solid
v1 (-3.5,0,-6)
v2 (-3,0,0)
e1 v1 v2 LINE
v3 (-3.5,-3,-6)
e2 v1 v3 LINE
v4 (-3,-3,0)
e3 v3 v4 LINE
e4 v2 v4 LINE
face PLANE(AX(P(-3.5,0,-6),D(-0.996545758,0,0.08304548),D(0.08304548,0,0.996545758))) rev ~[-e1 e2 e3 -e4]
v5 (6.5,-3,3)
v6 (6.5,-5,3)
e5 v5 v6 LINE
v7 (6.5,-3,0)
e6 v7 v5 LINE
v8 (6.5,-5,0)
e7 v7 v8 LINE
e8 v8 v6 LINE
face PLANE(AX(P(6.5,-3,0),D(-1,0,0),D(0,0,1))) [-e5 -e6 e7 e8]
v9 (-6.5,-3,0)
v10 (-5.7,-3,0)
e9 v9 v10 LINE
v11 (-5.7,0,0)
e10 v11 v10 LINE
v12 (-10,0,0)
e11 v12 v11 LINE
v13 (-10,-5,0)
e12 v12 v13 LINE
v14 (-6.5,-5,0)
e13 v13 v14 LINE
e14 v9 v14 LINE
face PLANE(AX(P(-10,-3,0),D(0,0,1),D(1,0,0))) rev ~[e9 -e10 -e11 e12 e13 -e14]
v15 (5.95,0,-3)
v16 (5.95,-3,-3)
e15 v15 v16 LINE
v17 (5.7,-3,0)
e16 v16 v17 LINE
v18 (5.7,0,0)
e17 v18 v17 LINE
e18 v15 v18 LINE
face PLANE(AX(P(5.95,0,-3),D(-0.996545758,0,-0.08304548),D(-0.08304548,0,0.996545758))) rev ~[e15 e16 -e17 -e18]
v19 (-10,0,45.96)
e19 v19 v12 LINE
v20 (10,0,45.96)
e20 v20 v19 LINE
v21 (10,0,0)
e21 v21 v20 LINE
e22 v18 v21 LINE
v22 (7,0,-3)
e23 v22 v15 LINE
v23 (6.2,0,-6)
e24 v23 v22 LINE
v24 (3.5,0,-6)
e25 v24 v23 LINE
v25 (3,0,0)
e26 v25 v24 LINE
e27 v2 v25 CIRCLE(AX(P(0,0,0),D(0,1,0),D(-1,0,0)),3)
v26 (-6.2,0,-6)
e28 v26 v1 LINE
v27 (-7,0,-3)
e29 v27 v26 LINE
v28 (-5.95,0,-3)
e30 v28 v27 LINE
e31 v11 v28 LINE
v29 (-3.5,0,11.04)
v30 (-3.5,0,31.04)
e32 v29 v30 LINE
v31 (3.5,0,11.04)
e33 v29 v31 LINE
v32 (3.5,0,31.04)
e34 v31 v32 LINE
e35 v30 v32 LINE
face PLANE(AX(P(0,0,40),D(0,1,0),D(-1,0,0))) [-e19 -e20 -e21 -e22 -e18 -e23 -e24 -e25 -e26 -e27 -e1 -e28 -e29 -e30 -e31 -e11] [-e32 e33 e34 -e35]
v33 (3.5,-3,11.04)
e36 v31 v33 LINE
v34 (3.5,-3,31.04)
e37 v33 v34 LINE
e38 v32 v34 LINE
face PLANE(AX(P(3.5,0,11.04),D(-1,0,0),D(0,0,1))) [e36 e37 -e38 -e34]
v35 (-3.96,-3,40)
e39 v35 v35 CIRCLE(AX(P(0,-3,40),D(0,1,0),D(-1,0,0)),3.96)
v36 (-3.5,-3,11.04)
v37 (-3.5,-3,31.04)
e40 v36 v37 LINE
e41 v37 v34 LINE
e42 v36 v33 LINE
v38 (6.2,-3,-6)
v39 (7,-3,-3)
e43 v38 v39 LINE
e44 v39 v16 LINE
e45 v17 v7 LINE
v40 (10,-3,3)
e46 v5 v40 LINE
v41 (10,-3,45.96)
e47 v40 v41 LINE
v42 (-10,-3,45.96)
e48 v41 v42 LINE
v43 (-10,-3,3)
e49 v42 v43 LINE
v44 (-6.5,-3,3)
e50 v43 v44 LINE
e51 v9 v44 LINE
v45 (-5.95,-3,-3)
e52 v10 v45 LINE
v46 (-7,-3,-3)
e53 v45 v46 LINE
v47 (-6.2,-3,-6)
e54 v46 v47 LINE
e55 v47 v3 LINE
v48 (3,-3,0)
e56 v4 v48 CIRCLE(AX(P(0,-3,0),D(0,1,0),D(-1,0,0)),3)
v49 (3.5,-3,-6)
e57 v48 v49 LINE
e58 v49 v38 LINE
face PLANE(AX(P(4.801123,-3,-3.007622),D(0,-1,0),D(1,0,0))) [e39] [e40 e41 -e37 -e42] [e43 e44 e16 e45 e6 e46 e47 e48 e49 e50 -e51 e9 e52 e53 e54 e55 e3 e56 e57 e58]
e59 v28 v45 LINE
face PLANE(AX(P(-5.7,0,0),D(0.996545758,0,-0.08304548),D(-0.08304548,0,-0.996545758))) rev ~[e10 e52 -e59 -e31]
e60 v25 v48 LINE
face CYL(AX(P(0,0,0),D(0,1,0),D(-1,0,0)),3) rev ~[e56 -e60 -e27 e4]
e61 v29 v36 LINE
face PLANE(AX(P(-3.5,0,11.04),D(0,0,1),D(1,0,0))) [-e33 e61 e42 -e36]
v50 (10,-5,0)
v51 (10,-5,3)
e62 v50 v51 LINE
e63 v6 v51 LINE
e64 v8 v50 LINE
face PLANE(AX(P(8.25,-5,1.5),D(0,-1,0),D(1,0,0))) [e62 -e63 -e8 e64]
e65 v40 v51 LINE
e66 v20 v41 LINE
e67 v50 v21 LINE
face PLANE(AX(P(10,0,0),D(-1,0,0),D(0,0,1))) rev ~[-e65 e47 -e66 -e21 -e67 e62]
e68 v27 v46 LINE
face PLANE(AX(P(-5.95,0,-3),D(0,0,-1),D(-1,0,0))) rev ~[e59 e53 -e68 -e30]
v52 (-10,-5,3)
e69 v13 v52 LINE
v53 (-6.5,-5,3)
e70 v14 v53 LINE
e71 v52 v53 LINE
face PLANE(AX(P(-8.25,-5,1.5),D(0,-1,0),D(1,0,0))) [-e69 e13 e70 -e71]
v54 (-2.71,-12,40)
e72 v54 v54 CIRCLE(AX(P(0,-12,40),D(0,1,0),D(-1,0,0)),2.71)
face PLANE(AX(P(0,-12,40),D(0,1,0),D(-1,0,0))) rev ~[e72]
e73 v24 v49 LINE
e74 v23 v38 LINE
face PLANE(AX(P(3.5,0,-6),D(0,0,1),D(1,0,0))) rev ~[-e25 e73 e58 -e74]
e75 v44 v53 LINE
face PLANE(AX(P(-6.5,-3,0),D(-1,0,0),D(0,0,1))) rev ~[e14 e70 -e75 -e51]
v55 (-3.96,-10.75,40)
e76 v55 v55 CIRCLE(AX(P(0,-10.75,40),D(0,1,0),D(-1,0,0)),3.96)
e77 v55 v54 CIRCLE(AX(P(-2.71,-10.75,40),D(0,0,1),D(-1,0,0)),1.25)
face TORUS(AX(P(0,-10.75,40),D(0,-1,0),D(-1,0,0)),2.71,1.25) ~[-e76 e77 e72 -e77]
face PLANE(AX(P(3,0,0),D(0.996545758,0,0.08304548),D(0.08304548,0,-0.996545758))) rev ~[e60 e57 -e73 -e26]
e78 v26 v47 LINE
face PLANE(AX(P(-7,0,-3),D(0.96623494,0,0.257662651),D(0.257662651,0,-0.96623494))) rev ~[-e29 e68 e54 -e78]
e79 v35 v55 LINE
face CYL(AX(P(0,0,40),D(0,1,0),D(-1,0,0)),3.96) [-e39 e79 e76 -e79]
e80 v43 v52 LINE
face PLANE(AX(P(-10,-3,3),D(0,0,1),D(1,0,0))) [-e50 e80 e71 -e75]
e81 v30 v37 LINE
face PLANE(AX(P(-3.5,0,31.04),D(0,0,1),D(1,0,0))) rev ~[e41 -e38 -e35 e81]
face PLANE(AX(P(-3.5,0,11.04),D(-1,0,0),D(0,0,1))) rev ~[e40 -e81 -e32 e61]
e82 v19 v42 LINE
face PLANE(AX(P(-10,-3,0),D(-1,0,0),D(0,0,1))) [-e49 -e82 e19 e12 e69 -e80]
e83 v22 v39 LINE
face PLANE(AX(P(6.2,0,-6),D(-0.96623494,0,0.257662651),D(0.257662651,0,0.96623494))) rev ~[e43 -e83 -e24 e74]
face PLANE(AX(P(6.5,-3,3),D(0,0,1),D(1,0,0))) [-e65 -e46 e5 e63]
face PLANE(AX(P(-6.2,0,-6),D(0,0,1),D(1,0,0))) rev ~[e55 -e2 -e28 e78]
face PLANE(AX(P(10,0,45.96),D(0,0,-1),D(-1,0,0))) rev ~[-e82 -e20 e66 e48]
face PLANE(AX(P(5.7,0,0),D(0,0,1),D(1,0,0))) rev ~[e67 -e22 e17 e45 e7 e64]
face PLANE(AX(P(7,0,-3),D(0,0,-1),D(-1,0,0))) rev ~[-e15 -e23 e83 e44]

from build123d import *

# Parameters (mm, degrees)
F0_W     = 7
F0_H     = 20
F0_R     = 3.96
F1_DEPTH = 3
F2_R     = 3.96
F3_DEPTH = 12
F4_R     = 1.25
F5_W     = 3.5
F5_H     = 3
F6_DEPTH = 2


with BuildPart() as f1:
    # F0 (on Front) → F1 (new body)
    with BuildSketch(Plane.XZ):
        Polygon((5.7, 0), (3, 0), (3.5, -6), (6.2, -6), (7, -3), (5.95, -3), align=None)
        with BuildLine():
            ThreePointArc((-3, 0), (0, 3), (3, 0))
            Line((3, 0), (5.7, 0))
            Line((5.7, 0), (10, 0))
            Line((10, 0), (10, 45.96))
            Line((10, 45.96), (-10, 45.96))
            Line((-10, 45.96), (-10, 0))
            Line((-10, 0), (-5.7, 0))
            Line((-5.7, 0), (-3, 0))
        make_face()
        with Locations((0, 21.04)):
            Rectangle(F0_W, F0_H, mode=Mode.SUBTRACT)
        with Locations((0, 40)):
            Circle(F0_R, mode=Mode.SUBTRACT)
        Polygon((-3.5, -6), (-3, 0), (-5.7, 0), (-5.95, -3), (-7, -3), (-6.2, -6), align=None)
        with Locations((0, 40)):
            Circle(F0_R)
    extrude(amount=F1_DEPTH)

    # F2 (on face) → F3 (join)
    with BuildSketch(Plane(origin=(0, 0, 0), x_dir=(-1, 0, 0), z_dir=(0, 1, 0))):
        with Locations((0, 40)):
            Circle(F2_R)
    extrude(amount=-F3_DEPTH)

    # F4
    f4_edges = [f1.edges().sort_by_distance(p)[0] for p in [
        (3.96, -12, 40),
    ]]
    fillet(f4_edges, radius=F4_R)

    # F5 (on face) → F6 (join)
    with BuildSketch(Plane.XZ.offset(3)):
        with Locations((-8.25, 1.5)):
            Rectangle(F5_W, F5_H)
        with Locations((8.25, 1.5)):
            Rectangle(F5_W, F5_H)
    extrude(amount=F6_DEPTH)


solid = f1.part
